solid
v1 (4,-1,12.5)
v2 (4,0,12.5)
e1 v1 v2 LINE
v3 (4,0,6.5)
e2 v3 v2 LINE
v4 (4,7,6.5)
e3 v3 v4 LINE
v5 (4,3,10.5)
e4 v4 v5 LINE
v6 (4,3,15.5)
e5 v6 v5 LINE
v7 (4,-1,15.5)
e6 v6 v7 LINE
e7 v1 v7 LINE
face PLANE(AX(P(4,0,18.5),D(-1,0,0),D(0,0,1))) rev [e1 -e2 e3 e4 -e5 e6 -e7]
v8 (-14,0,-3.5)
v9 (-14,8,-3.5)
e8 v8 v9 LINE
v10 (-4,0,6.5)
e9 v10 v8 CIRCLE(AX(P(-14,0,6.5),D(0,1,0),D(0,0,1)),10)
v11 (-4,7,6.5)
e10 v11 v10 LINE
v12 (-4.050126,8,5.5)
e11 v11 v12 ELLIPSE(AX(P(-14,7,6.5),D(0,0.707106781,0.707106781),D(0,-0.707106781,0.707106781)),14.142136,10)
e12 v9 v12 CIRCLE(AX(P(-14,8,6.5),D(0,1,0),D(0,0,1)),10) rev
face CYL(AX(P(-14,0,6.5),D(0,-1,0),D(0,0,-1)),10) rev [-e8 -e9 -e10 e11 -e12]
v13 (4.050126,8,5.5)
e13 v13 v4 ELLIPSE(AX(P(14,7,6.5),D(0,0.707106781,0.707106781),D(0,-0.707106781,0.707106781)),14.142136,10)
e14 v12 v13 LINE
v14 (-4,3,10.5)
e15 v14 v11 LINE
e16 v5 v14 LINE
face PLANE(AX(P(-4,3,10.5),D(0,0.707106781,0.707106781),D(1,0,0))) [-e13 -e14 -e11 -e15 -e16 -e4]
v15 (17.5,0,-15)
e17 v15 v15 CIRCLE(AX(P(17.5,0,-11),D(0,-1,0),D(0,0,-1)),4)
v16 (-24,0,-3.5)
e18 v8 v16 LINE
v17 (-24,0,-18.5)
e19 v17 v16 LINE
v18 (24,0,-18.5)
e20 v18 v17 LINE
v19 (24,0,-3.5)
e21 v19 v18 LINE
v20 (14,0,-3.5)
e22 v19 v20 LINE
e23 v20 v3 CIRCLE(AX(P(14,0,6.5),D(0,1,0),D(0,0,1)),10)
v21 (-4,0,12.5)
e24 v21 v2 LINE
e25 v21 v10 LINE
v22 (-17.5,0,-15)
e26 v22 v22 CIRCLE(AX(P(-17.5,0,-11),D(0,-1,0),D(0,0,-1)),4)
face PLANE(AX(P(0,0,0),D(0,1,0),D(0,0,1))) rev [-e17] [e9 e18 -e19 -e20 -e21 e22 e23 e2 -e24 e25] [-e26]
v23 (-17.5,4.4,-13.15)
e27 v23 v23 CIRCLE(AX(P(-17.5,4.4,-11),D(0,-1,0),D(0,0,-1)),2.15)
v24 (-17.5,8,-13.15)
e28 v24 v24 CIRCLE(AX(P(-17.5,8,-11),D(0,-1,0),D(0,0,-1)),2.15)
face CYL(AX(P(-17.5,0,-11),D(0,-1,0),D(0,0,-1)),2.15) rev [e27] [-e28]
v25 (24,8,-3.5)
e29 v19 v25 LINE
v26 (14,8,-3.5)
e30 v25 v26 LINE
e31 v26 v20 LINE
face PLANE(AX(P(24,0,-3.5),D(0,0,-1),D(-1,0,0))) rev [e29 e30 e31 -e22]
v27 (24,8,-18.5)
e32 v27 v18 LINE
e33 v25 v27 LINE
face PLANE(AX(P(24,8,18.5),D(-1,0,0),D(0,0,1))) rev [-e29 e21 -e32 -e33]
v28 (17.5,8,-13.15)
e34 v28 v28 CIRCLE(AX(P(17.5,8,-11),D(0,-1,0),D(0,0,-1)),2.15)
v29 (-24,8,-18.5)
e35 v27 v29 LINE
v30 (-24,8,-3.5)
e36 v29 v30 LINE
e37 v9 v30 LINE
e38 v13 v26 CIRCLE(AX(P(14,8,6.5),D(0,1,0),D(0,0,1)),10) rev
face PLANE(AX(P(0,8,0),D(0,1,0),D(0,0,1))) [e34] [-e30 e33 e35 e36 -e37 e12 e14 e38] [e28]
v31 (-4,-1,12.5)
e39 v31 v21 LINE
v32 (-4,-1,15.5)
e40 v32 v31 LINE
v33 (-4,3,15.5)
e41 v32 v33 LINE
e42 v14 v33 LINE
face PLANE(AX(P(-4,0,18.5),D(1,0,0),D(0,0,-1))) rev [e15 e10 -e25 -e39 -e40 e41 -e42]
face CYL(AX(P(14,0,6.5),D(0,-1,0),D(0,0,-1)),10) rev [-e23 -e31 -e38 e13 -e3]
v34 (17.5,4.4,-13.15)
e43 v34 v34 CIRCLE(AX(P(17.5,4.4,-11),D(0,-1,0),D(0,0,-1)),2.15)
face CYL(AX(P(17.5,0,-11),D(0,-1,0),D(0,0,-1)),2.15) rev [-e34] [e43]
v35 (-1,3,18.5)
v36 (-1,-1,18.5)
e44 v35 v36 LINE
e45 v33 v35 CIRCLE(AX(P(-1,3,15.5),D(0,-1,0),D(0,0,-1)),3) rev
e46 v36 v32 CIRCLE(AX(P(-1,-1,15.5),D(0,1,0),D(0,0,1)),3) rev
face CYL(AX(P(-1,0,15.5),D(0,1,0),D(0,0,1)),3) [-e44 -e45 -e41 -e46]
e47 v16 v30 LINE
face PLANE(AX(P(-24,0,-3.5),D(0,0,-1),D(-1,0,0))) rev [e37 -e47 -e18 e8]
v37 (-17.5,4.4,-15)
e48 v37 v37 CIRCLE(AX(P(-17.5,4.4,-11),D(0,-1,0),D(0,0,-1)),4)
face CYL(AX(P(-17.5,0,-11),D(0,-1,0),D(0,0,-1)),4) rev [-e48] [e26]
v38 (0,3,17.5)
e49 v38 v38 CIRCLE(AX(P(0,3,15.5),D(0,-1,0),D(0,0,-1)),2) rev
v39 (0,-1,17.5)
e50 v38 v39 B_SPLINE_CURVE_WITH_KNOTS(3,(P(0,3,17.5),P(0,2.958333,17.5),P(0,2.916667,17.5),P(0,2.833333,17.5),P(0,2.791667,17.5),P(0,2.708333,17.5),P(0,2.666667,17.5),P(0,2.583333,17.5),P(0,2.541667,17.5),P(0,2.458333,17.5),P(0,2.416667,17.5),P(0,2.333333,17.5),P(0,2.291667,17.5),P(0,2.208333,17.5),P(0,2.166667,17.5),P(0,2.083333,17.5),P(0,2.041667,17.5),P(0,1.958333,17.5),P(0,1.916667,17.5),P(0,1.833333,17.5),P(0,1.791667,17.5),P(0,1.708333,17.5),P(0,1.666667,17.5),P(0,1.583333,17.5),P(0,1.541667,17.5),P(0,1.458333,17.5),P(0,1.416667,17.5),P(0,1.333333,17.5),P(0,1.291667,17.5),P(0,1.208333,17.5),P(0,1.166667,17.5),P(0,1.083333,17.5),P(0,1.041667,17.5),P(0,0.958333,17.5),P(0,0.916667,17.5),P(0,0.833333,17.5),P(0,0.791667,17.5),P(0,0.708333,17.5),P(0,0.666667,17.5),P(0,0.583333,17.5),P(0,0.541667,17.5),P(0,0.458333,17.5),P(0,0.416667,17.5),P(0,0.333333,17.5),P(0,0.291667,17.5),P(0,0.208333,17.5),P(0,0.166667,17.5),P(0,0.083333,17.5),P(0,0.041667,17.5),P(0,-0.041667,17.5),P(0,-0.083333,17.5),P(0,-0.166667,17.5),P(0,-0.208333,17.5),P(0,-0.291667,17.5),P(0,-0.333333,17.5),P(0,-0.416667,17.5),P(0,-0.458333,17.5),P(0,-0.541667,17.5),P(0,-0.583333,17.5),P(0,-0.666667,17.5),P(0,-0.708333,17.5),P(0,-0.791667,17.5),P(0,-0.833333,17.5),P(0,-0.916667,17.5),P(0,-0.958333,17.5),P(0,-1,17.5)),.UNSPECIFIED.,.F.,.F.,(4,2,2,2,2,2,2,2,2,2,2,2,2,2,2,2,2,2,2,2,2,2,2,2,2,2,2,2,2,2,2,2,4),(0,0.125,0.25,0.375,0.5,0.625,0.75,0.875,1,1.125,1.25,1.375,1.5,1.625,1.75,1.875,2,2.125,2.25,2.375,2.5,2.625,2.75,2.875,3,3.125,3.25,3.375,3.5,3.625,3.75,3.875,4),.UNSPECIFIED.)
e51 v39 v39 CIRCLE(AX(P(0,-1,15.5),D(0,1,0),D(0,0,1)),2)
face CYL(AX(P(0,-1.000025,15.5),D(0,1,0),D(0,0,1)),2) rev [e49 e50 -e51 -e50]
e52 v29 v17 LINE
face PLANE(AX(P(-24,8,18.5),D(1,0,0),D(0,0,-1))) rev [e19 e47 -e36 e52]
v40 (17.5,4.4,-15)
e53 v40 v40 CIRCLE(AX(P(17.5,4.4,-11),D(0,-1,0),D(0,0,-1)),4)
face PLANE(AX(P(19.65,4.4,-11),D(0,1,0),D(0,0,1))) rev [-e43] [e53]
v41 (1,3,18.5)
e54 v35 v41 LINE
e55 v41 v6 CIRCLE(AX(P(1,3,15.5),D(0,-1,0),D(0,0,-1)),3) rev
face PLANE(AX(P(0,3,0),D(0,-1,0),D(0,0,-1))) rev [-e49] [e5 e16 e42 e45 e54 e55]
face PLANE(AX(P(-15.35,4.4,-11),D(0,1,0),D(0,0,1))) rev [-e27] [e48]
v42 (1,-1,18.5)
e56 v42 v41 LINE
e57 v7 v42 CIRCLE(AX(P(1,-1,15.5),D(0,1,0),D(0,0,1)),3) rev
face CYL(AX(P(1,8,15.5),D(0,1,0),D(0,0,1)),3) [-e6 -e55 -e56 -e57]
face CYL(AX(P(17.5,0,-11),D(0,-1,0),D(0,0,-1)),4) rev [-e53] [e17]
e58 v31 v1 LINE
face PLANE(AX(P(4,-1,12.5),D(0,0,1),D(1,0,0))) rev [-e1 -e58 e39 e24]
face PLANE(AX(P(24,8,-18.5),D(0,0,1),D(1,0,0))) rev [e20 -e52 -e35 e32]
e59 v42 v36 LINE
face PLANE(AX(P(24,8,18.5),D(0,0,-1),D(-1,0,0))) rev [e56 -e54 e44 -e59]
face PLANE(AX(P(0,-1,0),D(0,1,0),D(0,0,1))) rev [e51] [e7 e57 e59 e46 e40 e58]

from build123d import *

# Parameters (mm, degrees)
SKETCH_1_W                   = 48
SKETCH_1_H                   = 37
EXTRUDE_1_DEPTH              = 8
SKETCH_2_W                   = 20
SKETCH_2_H                   = 22
CUT_EXTRUDE_1_DEPTH          = 32.340867888
FILLET_1_R                   = 10
SKETCH_3_W                   = 8
SKETCH_3_H                   = 6
EXTRUDE_2_DEPTH              = 1
SKETCH_4_R                   = 2
CUT_EXTRUDE_2_DEPTH          = 32.610915836
HOLE_WIZARD_M4_1_D           = 4.3
HOLE_WIZARD_M4_1_CBORE_D     = 8
HOLE_WIZARD_M4_1_CBORE_DEPTH = 4.4
SKETCH_7_W                   = 8
SKETCH_7_H                   = 8
CUT_EXTRUDE_3_DEPTH          = 5
CHAMFER_1_SIZE               = 5
FILLET_2_R                   = 3


with BuildPart() as part:
    # 草图1 → 凸台-拉伸1 (new body)
    with BuildSketch(Plane(origin=(0, 0, 0), x_dir=(1, 0, 0), z_dir=(0, 1, 0))):
        Rectangle(SKETCH_1_W, SKETCH_1_H)
    extrude(amount=EXTRUDE_1_DEPTH)

    # 草图2 → 切除-拉伸1 (cut, through all)
    with BuildSketch(Plane(origin=(0, 8, 0), x_dir=(1, 0, 0), z_dir=(0, 1, 0))):
        with Locations((-14, -7.5)):
            Rectangle(SKETCH_2_W, SKETCH_2_H)
        with Locations((14, -7.5)):
            Rectangle(SKETCH_2_W, SKETCH_2_H)
    extrude(amount=-CUT_EXTRUDE_1_DEPTH, mode=Mode.SUBTRACT)

    # 圆角1
    fillet_1_edges = [part.edges().sort_by_distance(p)[0] for p in [
        (-4, 4, -3.5),
        (4, 4, -3.5),
    ]]
    fillet(fillet_1_edges, radius=FILLET_1_R)

    # 草图3 → 凸台-拉伸2 (add)
    with BuildSketch(Plane.XZ):
        with Locations((0, 15.5)):
            Rectangle(SKETCH_3_W, SKETCH_3_H)
    extrude(amount=EXTRUDE_2_DEPTH)

    # 草图4 → 切除-拉伸2 (cut, through all)
    with BuildSketch(Plane(origin=(0, 8, 0), x_dir=(1, 0, 0), z_dir=(0, 1, 0))):
        with Locations(Location((0, -15.5, 0), (0, 0, 270))):
            Circle(SKETCH_4_R)
    extrude(amount=-CUT_EXTRUDE_2_DEPTH, mode=Mode.SUBTRACT)

    # M4 六角凹头螺钉的柱形沉头孔1 (through all)
    with Locations(Plane(origin=(17.5, 0, -11), x_dir=(0, 0, -1), z_dir=(0, -1, 0))):
        with Locations((0, 0), (0, -35)):
            CounterBoreHole(HOLE_WIZARD_M4_1_D / 2, HOLE_WIZARD_M4_1_CBORE_D / 2, HOLE_WIZARD_M4_1_CBORE_DEPTH)

    # 草图7 → 切除-拉伸3 (cut)
    with BuildSketch(Plane(origin=(0, 8, 0), x_dir=(1, 0, 0), z_dir=(0, 1, 0))):
        with Locations((0, -14.5)):
            Rectangle(SKETCH_7_W, SKETCH_7_H)
    extrude(amount=-CUT_EXTRUDE_3_DEPTH, mode=Mode.SUBTRACT)

    # 倒角1
    chamfer_1_edges = [part.edges().sort_by_distance(p)[0] for p in [
        (0, 8, 10.5),
    ]]
    chamfer(chamfer_1_edges, length=CHAMFER_1_SIZE - 0.0001)  # a hair under: the kernel refuses the full size

    # 圆角2
    fillet_2_edges = [part.edges().sort_by_distance(p)[0] for p in [
        (-4, 1, 18.5),
        (4, 1, 18.5),
    ]]
    fillet(fillet_2_edges, radius=FILLET_2_R)


solid = part.part
